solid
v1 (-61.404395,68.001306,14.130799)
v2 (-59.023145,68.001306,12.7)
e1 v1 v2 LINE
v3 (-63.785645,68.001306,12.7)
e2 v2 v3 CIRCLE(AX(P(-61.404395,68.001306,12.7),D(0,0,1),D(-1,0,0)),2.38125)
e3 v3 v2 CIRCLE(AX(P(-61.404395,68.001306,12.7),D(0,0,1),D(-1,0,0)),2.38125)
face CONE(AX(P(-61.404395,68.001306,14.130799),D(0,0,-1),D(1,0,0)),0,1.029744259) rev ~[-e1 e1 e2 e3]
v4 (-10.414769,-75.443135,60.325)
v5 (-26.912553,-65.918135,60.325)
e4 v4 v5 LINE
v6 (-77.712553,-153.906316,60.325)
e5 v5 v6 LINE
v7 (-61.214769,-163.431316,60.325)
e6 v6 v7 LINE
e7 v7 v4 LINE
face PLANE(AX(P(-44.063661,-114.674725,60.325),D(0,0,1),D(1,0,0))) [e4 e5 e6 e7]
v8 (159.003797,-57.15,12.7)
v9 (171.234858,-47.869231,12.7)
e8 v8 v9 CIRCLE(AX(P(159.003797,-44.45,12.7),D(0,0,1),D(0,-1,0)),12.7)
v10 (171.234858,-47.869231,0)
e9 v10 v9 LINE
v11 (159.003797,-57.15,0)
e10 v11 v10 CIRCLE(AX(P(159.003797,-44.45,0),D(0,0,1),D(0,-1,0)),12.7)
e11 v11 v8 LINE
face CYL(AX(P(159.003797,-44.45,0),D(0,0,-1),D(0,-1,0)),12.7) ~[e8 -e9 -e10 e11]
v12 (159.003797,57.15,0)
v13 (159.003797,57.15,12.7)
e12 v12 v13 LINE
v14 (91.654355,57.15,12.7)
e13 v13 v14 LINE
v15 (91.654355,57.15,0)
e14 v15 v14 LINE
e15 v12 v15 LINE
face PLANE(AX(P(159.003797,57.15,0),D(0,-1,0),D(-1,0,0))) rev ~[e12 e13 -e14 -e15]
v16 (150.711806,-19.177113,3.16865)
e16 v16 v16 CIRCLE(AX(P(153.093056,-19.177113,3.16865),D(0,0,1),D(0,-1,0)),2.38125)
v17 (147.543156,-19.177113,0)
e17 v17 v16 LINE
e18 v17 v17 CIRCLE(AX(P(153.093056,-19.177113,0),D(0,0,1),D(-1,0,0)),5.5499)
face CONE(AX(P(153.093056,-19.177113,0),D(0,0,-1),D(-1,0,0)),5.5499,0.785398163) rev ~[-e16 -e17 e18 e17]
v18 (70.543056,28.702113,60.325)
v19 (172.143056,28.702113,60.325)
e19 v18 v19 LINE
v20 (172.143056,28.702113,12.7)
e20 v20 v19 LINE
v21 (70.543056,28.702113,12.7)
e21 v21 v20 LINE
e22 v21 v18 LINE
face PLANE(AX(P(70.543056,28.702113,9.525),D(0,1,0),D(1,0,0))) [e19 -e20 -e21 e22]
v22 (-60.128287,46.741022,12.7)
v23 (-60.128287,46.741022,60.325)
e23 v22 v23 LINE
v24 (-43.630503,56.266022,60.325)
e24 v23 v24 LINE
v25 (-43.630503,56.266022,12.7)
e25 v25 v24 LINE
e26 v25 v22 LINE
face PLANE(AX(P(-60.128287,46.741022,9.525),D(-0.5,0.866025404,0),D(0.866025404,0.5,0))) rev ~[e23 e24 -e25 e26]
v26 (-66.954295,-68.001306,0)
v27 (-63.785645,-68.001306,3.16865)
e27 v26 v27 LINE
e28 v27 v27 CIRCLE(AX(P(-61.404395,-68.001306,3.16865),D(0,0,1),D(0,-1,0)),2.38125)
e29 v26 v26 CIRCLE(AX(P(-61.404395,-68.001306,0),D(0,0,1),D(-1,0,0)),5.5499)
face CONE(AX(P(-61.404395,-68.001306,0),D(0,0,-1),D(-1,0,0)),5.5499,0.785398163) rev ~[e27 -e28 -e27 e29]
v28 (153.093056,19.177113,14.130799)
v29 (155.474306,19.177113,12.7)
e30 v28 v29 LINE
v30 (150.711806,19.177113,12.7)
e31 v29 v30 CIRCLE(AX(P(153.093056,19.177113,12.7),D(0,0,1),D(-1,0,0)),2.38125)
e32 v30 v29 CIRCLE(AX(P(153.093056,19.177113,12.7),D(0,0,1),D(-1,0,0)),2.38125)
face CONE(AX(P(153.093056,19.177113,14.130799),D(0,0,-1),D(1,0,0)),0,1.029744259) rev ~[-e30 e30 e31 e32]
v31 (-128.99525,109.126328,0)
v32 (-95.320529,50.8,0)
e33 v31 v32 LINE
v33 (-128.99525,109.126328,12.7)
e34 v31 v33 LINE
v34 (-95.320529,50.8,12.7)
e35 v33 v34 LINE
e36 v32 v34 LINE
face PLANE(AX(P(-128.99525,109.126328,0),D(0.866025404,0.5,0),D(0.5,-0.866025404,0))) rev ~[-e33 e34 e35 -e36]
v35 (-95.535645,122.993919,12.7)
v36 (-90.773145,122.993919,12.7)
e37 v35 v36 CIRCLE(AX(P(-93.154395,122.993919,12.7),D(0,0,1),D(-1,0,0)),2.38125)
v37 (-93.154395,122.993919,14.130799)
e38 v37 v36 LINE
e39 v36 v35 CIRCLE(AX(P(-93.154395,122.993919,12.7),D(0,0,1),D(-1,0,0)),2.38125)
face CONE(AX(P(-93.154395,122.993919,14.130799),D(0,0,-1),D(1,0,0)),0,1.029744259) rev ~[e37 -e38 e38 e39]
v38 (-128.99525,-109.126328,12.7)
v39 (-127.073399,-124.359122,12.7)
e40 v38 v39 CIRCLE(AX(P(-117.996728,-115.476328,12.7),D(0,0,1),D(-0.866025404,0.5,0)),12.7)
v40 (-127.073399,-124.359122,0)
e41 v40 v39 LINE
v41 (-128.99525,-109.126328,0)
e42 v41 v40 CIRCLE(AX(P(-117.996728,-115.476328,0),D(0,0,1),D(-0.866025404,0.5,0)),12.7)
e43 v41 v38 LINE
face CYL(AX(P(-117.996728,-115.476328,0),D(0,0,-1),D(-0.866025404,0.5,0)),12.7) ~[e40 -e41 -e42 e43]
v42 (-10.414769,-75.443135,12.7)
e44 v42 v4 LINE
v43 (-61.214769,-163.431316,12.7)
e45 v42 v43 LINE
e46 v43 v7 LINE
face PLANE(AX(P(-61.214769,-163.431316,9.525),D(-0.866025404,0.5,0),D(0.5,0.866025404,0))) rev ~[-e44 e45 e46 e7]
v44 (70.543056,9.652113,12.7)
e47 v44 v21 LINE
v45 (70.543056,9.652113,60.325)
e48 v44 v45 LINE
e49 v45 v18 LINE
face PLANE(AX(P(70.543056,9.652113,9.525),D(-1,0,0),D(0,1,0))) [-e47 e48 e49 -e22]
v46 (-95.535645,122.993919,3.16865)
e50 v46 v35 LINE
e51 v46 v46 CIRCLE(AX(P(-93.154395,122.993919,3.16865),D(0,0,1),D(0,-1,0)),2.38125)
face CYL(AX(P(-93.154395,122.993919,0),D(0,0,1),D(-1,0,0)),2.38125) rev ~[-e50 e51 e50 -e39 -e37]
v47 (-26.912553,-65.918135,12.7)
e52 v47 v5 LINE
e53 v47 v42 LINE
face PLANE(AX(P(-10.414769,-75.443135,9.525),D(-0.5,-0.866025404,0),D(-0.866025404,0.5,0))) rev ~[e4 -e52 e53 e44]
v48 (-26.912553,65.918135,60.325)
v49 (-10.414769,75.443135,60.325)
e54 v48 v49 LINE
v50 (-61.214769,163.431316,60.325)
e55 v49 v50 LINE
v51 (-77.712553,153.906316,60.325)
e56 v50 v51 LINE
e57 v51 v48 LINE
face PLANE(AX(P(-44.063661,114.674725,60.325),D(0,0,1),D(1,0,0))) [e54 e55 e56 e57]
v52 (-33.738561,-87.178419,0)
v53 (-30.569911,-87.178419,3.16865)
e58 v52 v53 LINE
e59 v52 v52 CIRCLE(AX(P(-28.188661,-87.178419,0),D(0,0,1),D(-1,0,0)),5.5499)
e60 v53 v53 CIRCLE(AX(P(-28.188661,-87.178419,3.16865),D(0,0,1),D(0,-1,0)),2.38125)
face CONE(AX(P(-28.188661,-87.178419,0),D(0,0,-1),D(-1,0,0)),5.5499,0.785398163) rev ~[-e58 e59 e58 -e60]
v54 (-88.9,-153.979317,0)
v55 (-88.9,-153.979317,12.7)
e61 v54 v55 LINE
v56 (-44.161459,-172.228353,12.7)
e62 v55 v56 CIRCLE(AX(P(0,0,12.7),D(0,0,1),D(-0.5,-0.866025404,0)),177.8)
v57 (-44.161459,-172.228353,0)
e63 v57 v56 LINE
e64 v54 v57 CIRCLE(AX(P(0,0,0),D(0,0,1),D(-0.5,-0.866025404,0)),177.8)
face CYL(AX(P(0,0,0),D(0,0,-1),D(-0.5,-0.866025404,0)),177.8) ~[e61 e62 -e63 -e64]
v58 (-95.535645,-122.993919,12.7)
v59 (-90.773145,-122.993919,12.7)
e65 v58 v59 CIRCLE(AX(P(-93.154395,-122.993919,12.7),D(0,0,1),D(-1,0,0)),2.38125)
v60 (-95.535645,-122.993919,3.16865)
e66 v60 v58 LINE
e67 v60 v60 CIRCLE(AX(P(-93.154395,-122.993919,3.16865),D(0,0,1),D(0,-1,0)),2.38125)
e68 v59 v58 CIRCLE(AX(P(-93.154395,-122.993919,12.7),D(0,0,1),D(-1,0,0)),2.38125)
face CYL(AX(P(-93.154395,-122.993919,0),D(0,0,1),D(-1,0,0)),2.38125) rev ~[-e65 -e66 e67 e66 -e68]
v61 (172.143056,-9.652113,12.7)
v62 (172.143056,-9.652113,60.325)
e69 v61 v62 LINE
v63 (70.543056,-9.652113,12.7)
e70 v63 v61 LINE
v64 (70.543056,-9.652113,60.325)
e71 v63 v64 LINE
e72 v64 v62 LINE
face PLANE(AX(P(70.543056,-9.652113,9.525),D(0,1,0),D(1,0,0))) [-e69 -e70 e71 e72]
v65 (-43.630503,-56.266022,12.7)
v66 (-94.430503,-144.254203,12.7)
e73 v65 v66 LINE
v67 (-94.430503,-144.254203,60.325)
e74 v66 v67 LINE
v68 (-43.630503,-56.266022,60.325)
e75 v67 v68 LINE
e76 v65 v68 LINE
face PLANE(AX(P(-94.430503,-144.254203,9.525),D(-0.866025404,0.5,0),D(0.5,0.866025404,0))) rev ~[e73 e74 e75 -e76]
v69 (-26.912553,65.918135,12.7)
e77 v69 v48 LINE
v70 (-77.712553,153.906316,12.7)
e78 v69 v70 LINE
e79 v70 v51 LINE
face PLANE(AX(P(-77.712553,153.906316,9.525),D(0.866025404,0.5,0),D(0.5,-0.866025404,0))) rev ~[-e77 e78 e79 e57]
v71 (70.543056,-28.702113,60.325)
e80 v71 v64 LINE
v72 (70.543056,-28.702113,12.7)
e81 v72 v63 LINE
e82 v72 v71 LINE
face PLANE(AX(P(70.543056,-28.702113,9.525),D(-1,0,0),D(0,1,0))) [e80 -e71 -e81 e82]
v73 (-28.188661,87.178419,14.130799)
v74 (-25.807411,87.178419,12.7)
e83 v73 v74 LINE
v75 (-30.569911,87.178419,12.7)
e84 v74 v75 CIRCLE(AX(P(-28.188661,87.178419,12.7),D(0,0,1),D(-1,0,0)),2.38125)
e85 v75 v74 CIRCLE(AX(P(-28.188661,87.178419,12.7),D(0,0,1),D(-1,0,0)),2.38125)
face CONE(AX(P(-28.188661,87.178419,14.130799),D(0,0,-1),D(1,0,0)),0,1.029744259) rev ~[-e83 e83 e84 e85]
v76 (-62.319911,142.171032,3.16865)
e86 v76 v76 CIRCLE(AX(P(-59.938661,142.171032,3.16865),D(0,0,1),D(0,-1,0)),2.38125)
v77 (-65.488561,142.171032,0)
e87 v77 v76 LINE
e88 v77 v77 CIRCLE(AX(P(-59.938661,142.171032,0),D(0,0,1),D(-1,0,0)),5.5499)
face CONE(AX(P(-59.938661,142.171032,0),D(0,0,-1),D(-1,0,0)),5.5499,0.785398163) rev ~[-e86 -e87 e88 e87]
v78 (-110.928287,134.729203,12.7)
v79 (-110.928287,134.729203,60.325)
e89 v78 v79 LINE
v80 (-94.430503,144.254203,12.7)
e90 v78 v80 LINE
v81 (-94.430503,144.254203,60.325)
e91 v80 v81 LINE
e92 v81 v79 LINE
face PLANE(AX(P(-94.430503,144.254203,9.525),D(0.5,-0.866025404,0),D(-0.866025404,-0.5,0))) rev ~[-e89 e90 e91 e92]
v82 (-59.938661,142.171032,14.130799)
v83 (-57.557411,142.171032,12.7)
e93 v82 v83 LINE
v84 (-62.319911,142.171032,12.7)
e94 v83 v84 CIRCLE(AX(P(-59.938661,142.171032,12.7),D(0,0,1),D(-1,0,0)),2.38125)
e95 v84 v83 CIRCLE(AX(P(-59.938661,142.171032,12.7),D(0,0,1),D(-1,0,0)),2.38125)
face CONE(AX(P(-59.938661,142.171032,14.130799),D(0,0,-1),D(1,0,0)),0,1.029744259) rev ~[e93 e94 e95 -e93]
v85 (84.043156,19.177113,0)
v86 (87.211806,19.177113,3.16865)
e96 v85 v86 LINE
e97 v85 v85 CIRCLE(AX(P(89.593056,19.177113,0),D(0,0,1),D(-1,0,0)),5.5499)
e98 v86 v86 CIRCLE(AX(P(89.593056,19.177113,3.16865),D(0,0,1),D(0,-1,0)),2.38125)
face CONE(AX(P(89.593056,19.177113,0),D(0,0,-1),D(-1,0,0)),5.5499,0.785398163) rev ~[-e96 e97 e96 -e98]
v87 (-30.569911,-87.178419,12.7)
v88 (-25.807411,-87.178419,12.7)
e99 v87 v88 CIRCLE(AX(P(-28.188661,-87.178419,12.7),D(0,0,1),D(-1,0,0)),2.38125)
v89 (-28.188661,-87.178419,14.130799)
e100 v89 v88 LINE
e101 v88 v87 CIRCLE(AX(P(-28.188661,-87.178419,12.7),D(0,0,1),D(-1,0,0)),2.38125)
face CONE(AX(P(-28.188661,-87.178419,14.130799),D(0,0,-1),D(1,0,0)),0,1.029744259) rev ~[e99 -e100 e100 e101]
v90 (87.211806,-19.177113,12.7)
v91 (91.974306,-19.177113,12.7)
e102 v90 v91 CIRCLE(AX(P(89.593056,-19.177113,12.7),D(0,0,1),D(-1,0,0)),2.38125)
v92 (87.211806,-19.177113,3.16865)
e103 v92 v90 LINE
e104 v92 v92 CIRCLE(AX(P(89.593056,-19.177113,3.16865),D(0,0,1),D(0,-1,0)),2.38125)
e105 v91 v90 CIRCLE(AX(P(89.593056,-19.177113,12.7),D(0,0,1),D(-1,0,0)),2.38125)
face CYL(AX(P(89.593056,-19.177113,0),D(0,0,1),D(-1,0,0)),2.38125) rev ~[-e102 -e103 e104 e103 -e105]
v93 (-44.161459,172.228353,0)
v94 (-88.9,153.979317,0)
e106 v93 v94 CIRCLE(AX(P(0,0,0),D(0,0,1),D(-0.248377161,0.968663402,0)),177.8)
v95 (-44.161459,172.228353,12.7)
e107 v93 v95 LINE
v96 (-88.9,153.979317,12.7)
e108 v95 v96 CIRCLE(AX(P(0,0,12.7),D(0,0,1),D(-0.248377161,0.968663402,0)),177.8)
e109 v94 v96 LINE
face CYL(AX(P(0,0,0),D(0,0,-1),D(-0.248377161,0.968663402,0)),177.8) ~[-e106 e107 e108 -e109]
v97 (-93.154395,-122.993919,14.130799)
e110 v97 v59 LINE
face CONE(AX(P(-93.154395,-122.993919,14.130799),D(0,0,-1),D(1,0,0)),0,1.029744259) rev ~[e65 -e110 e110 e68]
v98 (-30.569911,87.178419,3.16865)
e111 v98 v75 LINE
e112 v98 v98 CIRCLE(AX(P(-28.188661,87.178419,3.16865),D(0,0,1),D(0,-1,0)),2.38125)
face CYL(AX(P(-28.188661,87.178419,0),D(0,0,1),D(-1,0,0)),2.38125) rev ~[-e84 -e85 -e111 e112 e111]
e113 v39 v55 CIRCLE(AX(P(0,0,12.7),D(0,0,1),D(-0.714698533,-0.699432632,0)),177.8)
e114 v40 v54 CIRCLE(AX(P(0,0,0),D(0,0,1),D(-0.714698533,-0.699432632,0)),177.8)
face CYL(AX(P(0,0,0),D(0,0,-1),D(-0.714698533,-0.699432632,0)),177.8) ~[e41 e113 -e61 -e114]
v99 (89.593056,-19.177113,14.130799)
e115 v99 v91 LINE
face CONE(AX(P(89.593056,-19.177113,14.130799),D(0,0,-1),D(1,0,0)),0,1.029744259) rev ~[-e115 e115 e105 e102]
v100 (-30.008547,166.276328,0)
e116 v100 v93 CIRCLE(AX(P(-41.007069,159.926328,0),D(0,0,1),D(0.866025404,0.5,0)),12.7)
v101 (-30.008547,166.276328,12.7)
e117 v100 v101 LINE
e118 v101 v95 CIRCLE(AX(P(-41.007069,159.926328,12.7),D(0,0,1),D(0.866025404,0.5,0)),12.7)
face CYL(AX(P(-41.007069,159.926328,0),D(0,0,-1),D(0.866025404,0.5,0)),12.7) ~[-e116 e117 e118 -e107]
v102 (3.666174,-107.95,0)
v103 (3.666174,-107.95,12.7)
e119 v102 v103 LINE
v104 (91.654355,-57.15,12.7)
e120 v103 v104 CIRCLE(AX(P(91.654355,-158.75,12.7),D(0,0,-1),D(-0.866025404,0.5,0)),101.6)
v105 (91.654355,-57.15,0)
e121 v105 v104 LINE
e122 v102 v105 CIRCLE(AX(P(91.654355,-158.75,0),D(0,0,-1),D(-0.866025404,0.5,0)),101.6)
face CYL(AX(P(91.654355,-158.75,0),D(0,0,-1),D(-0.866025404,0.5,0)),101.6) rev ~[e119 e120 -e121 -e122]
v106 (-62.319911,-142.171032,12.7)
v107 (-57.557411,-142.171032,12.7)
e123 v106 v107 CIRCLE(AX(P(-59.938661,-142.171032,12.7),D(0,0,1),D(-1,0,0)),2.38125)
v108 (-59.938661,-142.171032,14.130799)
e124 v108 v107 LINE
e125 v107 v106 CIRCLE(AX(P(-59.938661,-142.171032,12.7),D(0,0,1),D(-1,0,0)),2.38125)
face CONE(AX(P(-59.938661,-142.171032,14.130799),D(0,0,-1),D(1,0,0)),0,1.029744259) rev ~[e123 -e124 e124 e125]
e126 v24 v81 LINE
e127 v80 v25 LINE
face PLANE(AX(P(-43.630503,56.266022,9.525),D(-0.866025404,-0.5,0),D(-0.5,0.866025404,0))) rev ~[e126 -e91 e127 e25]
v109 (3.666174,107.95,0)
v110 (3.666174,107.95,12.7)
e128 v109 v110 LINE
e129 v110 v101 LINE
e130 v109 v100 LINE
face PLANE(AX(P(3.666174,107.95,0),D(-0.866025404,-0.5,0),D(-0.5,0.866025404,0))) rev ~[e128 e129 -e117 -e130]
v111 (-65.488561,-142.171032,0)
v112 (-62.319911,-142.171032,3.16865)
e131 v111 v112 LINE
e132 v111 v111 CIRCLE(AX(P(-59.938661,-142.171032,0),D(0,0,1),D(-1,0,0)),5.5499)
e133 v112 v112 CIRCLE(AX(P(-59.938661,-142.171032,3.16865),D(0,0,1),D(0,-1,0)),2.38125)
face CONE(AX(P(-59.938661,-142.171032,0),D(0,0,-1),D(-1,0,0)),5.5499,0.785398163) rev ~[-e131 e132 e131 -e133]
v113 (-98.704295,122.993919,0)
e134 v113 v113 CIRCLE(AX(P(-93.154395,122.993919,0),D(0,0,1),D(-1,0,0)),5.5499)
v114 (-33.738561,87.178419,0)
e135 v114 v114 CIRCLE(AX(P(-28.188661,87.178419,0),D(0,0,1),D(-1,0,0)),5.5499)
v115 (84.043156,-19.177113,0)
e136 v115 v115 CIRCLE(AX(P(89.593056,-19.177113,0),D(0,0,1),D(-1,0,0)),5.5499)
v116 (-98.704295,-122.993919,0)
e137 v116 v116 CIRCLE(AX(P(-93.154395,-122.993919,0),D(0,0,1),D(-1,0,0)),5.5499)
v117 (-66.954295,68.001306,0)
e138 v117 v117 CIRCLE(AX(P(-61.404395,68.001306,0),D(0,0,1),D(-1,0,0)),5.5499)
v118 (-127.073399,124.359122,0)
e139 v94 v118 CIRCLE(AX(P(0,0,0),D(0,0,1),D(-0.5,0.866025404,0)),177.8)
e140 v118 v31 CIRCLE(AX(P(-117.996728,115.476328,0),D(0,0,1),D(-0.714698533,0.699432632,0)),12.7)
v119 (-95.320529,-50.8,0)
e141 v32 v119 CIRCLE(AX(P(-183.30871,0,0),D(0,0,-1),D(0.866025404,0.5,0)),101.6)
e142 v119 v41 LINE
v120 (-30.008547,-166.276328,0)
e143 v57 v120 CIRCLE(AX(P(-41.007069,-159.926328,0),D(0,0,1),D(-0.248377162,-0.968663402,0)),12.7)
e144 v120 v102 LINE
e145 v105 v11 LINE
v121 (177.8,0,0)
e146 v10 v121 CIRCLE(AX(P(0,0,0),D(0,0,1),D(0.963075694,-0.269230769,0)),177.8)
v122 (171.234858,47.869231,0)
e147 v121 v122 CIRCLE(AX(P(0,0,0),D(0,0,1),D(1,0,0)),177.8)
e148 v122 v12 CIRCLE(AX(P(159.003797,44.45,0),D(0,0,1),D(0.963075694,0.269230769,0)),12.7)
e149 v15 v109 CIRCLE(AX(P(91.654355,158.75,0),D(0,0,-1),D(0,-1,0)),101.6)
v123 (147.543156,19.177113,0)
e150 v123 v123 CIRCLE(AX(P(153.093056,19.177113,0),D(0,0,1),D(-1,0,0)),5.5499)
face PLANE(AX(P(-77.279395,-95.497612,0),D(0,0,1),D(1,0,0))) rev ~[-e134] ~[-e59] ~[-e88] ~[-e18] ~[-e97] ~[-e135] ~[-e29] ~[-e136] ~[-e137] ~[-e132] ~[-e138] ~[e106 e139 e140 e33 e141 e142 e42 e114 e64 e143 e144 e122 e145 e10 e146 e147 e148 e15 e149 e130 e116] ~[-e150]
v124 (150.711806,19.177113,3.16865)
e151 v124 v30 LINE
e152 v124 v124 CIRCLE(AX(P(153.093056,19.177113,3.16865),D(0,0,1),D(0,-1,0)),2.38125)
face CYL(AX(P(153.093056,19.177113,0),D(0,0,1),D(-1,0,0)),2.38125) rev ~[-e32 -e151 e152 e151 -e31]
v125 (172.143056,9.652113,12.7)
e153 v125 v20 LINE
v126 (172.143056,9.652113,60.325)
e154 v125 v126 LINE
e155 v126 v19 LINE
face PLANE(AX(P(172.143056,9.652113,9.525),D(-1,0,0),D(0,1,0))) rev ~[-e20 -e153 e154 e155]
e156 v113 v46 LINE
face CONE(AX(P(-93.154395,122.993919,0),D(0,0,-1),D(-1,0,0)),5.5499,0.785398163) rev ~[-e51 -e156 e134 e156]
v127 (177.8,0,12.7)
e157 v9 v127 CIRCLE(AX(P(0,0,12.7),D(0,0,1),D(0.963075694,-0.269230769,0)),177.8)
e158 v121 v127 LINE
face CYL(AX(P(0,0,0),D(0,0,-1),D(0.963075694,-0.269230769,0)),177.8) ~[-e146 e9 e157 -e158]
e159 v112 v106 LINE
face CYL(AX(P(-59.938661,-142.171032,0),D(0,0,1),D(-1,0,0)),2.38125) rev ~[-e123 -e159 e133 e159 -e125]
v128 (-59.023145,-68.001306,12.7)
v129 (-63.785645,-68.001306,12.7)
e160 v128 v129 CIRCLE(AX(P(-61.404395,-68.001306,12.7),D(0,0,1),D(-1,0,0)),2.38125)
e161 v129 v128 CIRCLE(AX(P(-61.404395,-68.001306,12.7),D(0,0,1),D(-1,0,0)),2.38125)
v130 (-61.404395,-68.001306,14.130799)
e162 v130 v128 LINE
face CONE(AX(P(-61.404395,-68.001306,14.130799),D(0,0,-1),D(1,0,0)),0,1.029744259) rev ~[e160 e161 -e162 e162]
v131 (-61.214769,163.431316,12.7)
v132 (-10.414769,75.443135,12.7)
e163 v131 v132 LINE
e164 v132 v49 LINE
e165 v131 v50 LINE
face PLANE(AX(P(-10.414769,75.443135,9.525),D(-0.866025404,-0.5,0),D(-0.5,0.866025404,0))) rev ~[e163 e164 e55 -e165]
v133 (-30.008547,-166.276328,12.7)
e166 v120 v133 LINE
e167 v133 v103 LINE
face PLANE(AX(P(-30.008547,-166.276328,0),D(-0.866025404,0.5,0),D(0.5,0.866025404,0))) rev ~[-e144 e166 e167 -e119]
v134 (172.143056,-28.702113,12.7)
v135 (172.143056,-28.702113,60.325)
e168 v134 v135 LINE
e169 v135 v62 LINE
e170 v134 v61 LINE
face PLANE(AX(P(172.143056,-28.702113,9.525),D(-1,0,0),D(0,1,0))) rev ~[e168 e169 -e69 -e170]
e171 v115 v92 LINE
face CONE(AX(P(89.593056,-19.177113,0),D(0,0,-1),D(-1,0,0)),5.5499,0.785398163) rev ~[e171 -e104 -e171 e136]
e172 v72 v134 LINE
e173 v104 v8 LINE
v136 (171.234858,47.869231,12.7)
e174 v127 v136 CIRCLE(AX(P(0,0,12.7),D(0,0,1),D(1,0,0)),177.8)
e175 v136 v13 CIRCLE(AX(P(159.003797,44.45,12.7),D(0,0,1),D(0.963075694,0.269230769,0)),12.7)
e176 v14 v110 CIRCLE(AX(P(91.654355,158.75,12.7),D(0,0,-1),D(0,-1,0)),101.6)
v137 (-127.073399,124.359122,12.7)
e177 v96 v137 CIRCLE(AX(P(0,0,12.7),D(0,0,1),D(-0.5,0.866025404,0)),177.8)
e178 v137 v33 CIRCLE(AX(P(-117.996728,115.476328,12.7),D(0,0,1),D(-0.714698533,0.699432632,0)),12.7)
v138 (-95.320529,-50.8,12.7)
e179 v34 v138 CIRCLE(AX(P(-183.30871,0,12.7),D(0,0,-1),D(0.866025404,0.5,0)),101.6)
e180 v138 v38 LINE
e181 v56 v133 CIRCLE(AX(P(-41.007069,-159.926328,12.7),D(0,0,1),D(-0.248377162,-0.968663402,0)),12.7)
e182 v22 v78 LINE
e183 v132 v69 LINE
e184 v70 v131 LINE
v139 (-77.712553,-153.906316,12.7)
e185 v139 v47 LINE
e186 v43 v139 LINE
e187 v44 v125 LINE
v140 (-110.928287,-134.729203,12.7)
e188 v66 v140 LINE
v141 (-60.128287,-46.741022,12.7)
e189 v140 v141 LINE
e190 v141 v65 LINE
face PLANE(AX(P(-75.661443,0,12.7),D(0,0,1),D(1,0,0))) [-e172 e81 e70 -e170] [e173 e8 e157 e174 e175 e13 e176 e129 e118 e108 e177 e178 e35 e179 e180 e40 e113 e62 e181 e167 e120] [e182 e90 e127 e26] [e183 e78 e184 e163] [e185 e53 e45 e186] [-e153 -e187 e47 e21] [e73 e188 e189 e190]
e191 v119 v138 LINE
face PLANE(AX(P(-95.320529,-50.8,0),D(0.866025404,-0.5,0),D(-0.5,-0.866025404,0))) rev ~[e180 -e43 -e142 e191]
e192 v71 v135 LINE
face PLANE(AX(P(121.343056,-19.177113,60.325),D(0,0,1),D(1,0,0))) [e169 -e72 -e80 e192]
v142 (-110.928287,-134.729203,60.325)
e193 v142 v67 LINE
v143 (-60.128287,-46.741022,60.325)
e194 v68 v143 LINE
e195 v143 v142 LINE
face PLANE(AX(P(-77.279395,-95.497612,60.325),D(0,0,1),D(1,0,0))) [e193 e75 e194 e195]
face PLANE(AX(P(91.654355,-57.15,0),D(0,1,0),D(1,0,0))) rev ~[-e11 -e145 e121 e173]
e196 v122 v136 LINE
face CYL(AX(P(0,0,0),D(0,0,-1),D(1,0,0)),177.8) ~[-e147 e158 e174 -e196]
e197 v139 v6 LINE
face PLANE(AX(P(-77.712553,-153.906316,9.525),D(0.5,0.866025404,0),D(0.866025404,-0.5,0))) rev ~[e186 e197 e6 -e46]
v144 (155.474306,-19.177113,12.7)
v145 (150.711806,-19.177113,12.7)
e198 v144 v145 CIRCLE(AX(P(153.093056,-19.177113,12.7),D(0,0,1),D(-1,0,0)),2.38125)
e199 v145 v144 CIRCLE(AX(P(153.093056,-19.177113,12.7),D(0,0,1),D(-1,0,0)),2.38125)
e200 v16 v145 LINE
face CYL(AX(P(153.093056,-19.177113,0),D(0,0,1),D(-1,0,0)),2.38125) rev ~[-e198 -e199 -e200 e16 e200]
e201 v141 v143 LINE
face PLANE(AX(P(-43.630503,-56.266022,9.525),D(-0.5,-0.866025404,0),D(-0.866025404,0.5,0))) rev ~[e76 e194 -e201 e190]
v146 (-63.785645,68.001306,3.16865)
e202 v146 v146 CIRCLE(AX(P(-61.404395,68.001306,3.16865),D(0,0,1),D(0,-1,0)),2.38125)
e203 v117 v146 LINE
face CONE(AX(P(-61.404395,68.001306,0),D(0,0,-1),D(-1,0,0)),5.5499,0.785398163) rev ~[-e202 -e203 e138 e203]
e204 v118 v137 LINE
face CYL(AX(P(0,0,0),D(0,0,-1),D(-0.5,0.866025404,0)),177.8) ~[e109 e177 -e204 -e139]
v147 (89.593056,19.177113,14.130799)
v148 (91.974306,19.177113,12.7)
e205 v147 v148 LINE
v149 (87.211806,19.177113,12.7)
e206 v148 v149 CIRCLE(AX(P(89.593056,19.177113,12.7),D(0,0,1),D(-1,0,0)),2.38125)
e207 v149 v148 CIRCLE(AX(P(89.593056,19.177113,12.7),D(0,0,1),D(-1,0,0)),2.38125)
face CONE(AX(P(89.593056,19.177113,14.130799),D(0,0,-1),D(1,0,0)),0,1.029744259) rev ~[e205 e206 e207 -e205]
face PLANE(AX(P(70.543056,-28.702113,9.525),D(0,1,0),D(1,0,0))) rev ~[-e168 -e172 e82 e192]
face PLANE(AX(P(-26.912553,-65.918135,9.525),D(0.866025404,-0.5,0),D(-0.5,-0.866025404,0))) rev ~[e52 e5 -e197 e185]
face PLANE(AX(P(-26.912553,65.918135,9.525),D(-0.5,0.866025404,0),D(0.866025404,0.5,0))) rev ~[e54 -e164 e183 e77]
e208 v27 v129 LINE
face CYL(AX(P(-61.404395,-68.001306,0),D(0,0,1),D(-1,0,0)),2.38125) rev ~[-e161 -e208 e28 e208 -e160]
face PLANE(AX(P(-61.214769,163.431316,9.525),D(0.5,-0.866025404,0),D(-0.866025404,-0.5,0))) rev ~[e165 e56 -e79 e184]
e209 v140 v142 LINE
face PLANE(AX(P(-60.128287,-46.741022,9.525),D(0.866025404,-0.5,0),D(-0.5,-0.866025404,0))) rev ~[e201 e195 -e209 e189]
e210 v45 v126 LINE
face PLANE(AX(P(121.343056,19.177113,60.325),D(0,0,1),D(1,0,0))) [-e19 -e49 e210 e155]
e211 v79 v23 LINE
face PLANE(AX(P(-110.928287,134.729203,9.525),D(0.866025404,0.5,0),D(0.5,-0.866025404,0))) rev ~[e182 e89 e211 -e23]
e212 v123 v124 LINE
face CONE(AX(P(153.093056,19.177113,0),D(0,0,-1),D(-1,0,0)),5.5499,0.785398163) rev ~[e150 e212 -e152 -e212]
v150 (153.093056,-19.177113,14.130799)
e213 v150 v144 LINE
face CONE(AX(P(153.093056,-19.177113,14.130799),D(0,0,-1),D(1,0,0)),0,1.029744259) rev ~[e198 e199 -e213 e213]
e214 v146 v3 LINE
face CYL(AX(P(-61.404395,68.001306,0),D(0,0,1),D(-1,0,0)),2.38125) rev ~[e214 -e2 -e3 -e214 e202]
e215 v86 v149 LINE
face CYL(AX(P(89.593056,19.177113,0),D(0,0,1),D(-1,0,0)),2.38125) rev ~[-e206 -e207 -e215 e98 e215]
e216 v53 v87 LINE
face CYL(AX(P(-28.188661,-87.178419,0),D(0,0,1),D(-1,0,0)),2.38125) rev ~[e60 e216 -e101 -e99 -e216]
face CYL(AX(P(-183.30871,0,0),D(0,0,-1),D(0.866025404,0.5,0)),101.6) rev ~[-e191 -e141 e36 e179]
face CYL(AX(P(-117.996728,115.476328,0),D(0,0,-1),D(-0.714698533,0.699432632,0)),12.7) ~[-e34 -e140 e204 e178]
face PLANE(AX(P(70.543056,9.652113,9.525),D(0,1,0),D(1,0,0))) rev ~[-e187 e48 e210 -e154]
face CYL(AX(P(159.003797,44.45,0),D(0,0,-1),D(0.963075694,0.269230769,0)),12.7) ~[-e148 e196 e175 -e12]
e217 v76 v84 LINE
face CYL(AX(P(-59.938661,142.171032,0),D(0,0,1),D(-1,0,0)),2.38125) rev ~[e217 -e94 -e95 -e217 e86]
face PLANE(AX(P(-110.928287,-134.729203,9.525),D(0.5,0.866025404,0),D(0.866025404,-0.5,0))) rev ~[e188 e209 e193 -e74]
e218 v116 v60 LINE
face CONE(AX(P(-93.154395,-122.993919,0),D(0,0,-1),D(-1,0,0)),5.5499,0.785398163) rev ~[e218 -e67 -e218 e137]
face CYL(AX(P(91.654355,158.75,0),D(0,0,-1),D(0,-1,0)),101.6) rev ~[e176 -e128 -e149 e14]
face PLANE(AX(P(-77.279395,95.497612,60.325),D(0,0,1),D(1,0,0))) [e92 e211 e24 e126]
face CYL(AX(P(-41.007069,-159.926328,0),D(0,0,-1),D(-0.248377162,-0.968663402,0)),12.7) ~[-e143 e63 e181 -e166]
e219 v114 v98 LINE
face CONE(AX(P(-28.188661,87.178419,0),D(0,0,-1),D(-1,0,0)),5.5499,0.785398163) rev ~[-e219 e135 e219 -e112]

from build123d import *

# Parameters (mm, degrees)
F0_W           = 101.6
F0_H           = 19.05
F1_DEPTH       = 12.7
F2_DEPTH       = 9.525
F3_DEPTH       = 50.8
F4_D           = 4.7625
F4_DEPTH       = 12.7
F4_CSINK_D     = 11.0998
F4_CSINK_ANGLE = 90
F4_TIP         = 1.4307993491


with BuildPart() as f1:
    # F0 (on Top) → F1 (new body)
    with BuildSketch(Plane.XY):
        with BuildLine():
            Line((-88.9, -153.9793167929), (0, 0))
            Line((0, 0), (-88.9, 153.9793167929))
            ThreePointArc((-88.9, 153.9793167929), (-108.9975516555, 140.471967784), (-127.0733991266, 124.3591220394))
            ThreePointArc((-127.0733991266, 124.3591220394), (-130.596841253, 117.066025685), (-128.9952503885, 109.126327608))
            Line((-128.9952503885, 109.126327608), (-95.3205294432, 50.8))
            ThreePointArc((-95.3205294432, 50.8), (-81.7087104677, 0), (-95.3205294432, -50.8))
            Line((-95.3205294432, -50.8), (-128.9952503885, -109.126327608))
            ThreePointArc((-128.9952503885, -109.126327608), (-130.596841253, -117.066025685), (-127.0733991266, -124.3591220394))
            ThreePointArc((-127.0733991266, -124.3591220394), (-108.9975516555, -140.471967784), (-88.9, -153.9793167929))
        make_face()
        Polygon((-60.1282869611, -46.7410218803), (-43.630503019, -56.2660218803), (-94.430503019, -144.2542029048), (-110.9282869611, -134.7292029048), align=None, mode=Mode.SUBTRACT)
        Polygon((-43.630503019, 56.2660218803), (-60.1282869611, 46.7410218803), (-110.9282869611, 134.7292029048), (-94.430503019, 144.2542029048), align=None, mode=Mode.SUBTRACT)
        with BuildLine():
            Line((0, 0), (177.8, 0))
            ThreePointArc((177.8, 0), (176.1510684483, 24.1586647919), (171.2348584417, 47.8692307692))
            ThreePointArc((171.2348584417, 47.8692307692), (166.6805727898, 54.5671693366), (159.0037971245, 57.15))
            Line((159.0037971245, 57.15), (91.6543552339, 57.15))
            ThreePointArc((91.6543552339, 57.15), (40.8543552339, 70.7618189755), (3.6661742094, 107.95))
            Line((3.6661742094, 107.95), (-30.008546736, 166.276327608))
            ThreePointArc((-30.008546736, 166.276327608), (-36.0837315368, 171.6331950216), (-44.1614593151, 172.2283528086))
            ThreePointArc((-44.1614593151, 172.2283528086), (-67.1535167928, 164.630632576), (-88.9, 153.9793167929))
            Line((-88.9, 153.9793167929), (0, 0))
        make_face()
        Polygon((-10.4147688666, 75.4431349345), (-26.9125528087, 65.9181349345), (-77.7125528087, 153.906315959), (-61.2147688666, 163.431315959), align=None, mode=Mode.SUBTRACT)
        with Locations((121.3430558277, 19.1771130542)):
            Rectangle(F0_W, F0_H, mode=Mode.SUBTRACT)
        with BuildLine():
            ThreePointArc((159.0037971245, -57.15), (166.6805727898, -54.5671693366), (171.2348584417, -47.8692307692))
            ThreePointArc((171.2348584417, -47.8692307692), (176.1510684483, -24.1586647919), (177.8, 0))
            Line((177.8, 0), (0, 0))
            Line((0, 0), (-88.9, -153.9793167929))
            ThreePointArc((-88.9, -153.9793167929), (-67.1535167928, -164.630632576), (-44.1614593151, -172.2283528086))
            ThreePointArc((-44.1614593151, -172.2283528086), (-36.0837315368, -171.6331950216), (-30.008546736, -166.276327608))
            Line((-30.008546736, -166.276327608), (3.6661742094, -107.95))
            ThreePointArc((3.6661742094, -107.95), (40.8543552339, -70.7618189755), (91.6543552339, -57.15))
            Line((91.6543552339, -57.15), (159.0037971245, -57.15))
        make_face()
        Polygon((-26.9125528087, -65.9181349345), (-10.4147688666, -75.4431349345), (-61.2147688666, -163.431315959), (-77.7125528087, -153.906315959), align=None, mode=Mode.SUBTRACT)
        with Locations((121.3430558277, -19.1771130542)):
            Rectangle(F0_W, F0_H, mode=Mode.SUBTRACT)
    extrude(amount=F1_DEPTH)

    # F0 (on Top) → F2 (join)
    with BuildSketch(Plane.XY):
        Polygon((-94.430503019, -144.2542029048), (-43.630503019, -56.2660218803), (-60.1282869611, -46.7410218803), (-110.9282869611, -134.7292029048), align=None)
        Polygon((-61.2147688666, -163.431315959), (-10.4147688666, -75.4431349345), (-26.9125528087, -65.9181349345), (-77.7125528087, -153.906315959), align=None)
        with Locations((121.3430558277, -19.1771130542)):
            Rectangle(F0_W, F0_H)
        with Locations((121.3430558277, 19.1771130542)):
            Rectangle(F0_W, F0_H)
        Polygon((-77.7125528087, 153.906315959), (-26.9125528087, 65.9181349345), (-10.4147688666, 75.4431349345), (-61.2147688666, 163.431315959), align=None)
        Polygon((-110.9282869611, 134.7292029048), (-60.1282869611, 46.7410218803), (-43.630503019, 56.2660218803), (-94.430503019, 144.2542029048), align=None)
    extrude(amount=F2_DEPTH)

    # F3 (add): faces of the model
    f3_faces = [f1.faces().sort_by_distance(p)[0] for p in [
        (-77.2793949901, -95.4976123925, 9.525),
        (-44.0636608377, -114.6747254468, 9.525),
        (121.3430558277, -19.1771130542, 9.525),
        (121.3430558277, 19.1771130542, 9.525),
        (-44.0636608377, 114.6747254468, 9.525),
        (-77.2793949901, 95.4976123925, 9.525),
    ]]
    extrude(f3_faces, amount=F3_DEPTH)

    # F4
    with Locations(Plane(origin=(0, 0, 0), x_dir=(1, 0, 0), z_dir=(0, 0, -1))):
        with Locations((-93.1543949901, 122.9939189627), (-59.9386608377, 142.1710320169), (-28.1886608377, 87.1784188766), (-61.4043949901, 68.0013058224), (89.5930558277, 19.1771130542), (153.0930558277, 19.1771130542), (153.0930558277, -19.1771130542), (89.5930558277, -19.1771130542), (-61.4043949901, -68.0013058224), (-28.1886608377, -87.1784188766), (-59.9386608377, -142.1710320169), (-93.1543949901, -122.9939189627)):
            CounterSinkHole(F4_D / 2, F4_CSINK_D / 2, depth=F4_DEPTH, counter_sink_angle=F4_CSINK_ANGLE)
            with Locations((0, 0, -(F4_DEPTH + F4_TIP / 2))):  # 118° drill point
                Cone(0, F4_D / 2, F4_TIP, mode=Mode.SUBTRACT)


solid = f1.part
